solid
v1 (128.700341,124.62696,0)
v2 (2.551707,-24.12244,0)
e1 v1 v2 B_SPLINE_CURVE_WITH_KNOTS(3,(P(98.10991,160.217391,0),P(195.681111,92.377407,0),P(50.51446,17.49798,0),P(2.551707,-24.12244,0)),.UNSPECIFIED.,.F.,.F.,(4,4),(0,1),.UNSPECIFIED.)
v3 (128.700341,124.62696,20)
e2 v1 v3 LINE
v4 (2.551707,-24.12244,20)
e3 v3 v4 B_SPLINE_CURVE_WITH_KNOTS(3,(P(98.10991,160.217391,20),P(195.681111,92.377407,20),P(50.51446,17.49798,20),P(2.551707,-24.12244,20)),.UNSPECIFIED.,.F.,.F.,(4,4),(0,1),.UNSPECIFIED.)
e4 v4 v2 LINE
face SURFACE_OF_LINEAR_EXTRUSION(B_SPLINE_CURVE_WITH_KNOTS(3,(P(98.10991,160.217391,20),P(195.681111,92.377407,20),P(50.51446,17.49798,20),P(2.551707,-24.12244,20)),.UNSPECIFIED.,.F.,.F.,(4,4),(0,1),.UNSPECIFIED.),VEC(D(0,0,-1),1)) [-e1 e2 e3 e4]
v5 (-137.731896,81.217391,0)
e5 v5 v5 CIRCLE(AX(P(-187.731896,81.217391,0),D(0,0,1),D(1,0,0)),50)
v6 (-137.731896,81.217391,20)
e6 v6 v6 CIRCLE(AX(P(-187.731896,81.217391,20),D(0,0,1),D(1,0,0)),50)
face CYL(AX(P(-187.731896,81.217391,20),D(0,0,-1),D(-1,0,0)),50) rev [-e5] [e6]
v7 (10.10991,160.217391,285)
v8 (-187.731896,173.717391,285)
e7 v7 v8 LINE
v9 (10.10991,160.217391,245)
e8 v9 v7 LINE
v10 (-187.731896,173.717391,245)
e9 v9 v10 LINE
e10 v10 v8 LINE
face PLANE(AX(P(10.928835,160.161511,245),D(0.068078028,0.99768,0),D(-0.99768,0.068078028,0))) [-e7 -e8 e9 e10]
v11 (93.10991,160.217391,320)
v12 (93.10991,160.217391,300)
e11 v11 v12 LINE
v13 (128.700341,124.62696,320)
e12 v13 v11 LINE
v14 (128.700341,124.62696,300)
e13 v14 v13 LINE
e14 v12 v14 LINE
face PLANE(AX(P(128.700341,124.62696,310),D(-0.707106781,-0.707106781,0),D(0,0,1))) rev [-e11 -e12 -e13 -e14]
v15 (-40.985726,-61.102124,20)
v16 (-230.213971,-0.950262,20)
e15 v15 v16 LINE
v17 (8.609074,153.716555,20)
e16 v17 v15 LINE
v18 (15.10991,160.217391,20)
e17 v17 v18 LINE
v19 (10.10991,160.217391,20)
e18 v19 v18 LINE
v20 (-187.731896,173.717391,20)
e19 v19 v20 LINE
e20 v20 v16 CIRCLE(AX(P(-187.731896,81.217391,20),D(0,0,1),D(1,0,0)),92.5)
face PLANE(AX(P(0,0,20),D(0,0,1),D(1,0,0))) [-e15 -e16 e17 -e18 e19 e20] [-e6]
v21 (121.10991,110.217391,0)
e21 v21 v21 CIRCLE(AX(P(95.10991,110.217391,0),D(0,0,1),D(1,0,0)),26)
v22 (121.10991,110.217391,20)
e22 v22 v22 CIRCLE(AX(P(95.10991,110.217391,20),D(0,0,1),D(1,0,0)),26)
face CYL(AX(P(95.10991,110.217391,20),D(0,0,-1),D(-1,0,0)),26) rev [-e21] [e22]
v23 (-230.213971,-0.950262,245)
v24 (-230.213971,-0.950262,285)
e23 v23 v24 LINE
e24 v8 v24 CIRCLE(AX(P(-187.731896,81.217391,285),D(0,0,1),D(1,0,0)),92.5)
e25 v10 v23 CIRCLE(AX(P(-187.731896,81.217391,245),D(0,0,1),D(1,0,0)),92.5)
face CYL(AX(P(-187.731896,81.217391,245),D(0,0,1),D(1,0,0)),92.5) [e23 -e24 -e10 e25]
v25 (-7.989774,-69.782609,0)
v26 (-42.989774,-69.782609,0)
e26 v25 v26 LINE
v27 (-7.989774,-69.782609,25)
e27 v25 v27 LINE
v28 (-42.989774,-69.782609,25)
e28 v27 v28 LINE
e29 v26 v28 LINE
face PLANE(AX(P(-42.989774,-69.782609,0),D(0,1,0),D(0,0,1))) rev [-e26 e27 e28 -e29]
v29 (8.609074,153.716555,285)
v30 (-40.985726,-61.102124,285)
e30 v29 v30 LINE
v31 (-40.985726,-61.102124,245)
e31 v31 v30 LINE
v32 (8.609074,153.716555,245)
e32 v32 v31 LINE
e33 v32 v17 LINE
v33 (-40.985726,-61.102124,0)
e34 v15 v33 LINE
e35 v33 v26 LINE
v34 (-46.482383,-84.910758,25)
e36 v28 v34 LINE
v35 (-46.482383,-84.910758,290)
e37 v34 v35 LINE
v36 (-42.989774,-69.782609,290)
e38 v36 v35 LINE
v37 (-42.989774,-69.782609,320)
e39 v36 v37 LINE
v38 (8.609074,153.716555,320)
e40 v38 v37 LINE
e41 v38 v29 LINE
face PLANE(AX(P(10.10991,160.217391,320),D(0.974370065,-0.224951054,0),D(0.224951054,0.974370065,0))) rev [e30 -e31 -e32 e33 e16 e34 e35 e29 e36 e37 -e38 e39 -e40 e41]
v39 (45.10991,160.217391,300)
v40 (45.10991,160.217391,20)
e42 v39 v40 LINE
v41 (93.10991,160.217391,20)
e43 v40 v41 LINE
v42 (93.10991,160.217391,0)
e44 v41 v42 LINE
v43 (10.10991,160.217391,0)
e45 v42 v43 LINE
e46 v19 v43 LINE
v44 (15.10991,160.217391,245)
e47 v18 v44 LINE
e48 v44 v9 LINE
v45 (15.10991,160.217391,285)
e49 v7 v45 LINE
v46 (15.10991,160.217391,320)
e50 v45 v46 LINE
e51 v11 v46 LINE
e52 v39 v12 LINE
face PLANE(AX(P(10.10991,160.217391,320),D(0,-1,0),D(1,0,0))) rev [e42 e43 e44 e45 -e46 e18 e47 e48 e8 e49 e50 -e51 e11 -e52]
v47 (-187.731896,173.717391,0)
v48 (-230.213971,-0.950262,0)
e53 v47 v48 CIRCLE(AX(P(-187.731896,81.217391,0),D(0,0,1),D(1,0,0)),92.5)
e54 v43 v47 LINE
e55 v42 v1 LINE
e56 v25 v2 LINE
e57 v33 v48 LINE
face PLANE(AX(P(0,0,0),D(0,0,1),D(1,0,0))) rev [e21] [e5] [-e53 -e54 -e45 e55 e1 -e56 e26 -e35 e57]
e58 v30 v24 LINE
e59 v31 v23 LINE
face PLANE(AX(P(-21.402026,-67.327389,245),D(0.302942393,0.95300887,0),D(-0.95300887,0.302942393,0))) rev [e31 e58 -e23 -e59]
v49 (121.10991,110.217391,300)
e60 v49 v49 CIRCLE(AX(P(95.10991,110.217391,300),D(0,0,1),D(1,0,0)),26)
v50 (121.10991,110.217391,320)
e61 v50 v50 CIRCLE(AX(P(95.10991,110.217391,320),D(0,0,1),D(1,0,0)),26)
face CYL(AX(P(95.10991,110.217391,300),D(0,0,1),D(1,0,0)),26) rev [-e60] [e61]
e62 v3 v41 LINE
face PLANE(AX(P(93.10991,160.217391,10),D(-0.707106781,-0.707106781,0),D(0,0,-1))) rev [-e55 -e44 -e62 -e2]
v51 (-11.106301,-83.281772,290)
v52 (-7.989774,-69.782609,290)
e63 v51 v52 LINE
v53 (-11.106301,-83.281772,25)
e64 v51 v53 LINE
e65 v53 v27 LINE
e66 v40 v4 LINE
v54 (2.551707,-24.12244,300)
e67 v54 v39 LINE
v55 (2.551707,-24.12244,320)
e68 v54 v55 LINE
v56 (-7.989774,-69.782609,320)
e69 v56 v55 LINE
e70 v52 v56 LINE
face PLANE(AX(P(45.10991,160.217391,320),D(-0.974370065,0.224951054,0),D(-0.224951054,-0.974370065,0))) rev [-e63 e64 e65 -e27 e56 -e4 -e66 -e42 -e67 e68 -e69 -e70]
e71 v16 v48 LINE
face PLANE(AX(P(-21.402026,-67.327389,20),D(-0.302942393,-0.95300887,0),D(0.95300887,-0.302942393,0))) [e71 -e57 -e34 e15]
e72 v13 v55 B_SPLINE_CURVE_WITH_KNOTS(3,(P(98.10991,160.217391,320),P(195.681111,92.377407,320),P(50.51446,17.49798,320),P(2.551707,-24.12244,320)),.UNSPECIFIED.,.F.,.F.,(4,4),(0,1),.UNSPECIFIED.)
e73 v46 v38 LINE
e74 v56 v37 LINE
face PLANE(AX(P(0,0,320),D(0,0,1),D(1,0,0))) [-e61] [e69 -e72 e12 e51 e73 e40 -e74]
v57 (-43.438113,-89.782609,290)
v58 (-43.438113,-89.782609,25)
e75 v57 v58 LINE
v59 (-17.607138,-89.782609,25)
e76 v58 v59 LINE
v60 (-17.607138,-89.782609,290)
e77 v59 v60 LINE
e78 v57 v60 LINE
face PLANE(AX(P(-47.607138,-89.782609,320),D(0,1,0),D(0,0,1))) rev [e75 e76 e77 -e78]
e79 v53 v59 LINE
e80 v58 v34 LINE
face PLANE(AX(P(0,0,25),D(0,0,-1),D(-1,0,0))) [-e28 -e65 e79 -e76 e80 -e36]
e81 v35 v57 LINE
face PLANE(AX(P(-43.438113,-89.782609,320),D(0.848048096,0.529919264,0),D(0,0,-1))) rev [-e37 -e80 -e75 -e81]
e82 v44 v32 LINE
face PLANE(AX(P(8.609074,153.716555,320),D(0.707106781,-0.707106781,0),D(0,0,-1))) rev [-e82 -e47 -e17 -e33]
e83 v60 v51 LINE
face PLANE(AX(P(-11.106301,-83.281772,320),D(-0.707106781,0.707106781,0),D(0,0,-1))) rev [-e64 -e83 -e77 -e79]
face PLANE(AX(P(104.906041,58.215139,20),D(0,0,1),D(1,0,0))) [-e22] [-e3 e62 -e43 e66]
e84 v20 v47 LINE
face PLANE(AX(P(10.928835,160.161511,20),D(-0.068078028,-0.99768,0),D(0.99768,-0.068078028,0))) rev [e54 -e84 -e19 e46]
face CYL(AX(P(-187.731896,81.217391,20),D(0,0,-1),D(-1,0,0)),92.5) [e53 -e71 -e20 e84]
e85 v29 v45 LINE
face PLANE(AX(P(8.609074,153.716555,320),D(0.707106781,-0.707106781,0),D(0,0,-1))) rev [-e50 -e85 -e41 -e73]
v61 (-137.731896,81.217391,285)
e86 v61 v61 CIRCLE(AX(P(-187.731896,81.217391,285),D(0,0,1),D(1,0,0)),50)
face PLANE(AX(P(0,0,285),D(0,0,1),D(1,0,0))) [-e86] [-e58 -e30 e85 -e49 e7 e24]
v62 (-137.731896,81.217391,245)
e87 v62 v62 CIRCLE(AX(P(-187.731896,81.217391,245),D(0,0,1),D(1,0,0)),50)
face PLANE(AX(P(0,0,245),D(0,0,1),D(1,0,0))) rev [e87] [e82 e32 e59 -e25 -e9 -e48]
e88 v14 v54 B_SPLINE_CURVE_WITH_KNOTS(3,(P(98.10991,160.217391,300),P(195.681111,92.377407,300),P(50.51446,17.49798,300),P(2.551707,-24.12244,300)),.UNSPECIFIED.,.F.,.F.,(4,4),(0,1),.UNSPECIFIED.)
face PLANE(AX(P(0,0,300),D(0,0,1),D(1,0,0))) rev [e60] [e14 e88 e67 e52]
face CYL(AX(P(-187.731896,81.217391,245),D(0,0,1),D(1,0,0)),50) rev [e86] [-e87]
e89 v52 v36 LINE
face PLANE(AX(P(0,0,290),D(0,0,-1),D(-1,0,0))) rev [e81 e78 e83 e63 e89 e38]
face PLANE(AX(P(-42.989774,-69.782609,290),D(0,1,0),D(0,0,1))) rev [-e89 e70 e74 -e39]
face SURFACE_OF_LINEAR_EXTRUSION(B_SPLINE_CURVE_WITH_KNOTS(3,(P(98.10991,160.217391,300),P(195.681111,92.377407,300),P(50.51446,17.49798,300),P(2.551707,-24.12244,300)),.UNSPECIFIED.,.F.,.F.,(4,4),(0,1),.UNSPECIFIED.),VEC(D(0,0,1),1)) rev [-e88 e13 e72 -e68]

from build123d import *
from OCP.BRepFilletAPI import BRepFilletAPI_MakeChamfer

# Parameters (mm, degrees)
BOSS_EXTRU_1_DEPTH      = 320
ENL_V_MAT_EXTRU_1_DEPTH = 30
ENL_V_START             = -295
ENL_V_MAT_EXTRU_2_DEPTH = 25
ESQUISSE5_R             = 26
BOSS_EXTRU_2_DEPTH      = 20
BOSS_EXTRU_3_START      = -35
ESQUISSE5_3_R           = 50
BOSS_EXTRU_3_DEPTH      = 40
BOSS_EXTRU_4_START      = -300
ESQUISSE5_5_R           = 50
BOSS_EXTRU_4_DEPTH      = 20
BOSS_EXTRU_5_START      = -300
ESQUISSE5_6_R           = 26
BOSS_EXTRU_5_DEPTH      = 20
CHANFREIN1_SIZE         = 5
CHANFREIN1_SIZE_2       = 6.671835022
CHANFREIN2_SIZE         = 5
CHANFREIN2_SIZE2        = 6.671835022
CHANFREIN2_SIZE2_2      = 4.169025226
CHAMFER1_START          = 179.129452599
CHAMFER1_OUTLINE_W      = 53
CHAMFER1_OUTLINE_H      = 22
CHAMFER1_DEPTH          = 6.870547401
CHAMFER3_START          = 179.129452599
CHAMFER3_OUTLINE_W      = 53
CHAMFER3_OUTLINE_H      = 22
CHAMFER3_DEPTH          = 6.870547401


with BuildPart() as part:
    # Esquisse1 → Boss.-Extru.1 (new body)
    with BuildSketch(Plane.XY):
        Polygon((10.109909982, 160.217391304), (45.109909982, 160.217391304), (-12.607137799, -89.782608696), (-47.607137799, -89.782608696), align=None)
    extrude(amount=BOSS_EXTRU_1_DEPTH)

    # Esquisse2 → Enlèv. mat.-Extru.1 (cut)
    with BuildSketch(Plane.XY.offset(320)):
        Polygon((-47.607137799, -89.782608696), (-42.989773977, -69.782608696), (-7.989773977, -69.782608696), (-12.607137799, -89.782608696), align=None)
    extrude(amount=-ENL_V_MAT_EXTRU_1_DEPTH, mode=Mode.SUBTRACT)

    # Esquisse3 → Enlèv. mat.-Extru.2 (cut)
    with BuildSketch(Plane.XY.offset(320).offset(ENL_V_START)):
        Polygon((-47.607137799, -89.782608696), (-42.989773977, -69.782608696), (-7.989773977, -69.782608696), (-12.607137799, -89.782608696), align=None)
    extrude(amount=-ENL_V_MAT_EXTRU_2_DEPTH, mode=Mode.SUBTRACT)

    # Esquisse5 → Boss.-Extru.2 (add)
    with BuildSketch(Plane.XY.offset(320)):
        with BuildLine():
            Line((98.109909982, 160.217391304), (45.109909982, 160.217391304))
            Line((45.109909982, 160.217391304), (2.551706555, -24.122440094))
            add(Edge.make_bspline(
                [(98.109909982, 160.217391304), (195.681111268, 92.37740659), (50.514460477, 17.497979542), (2.551706555, -24.122440094)],
                knots=[0, 0, 0, 0, 1, 1, 1, 1], degree=3))
        make_face()
        with Locations((95.109909982, 110.217391304)):
            Circle(ESQUISSE5_R, mode=Mode.SUBTRACT)
    extrude(amount=-BOSS_EXTRU_2_DEPTH)

    # Esquisse5<3> → Boss.-Extru.3 (add)
    with BuildSketch(Plane.XY.offset(320).offset(BOSS_EXTRU_3_START)):
        with BuildLine():
            Line((-230.213971145, -0.950262244), (-40.985726083, -61.102123595))
            Line((-40.985726083, -61.102123595), (10.109909982, 160.217391304))
            Line((10.109909982, 160.217391304), (-187.731895981, 173.717391304))
            ThreePointArc((-187.731895981, 173.717391304), (-277.611698921, 103.077652588), (-230.213971145, -0.950262244))
        make_face()
        with Locations((-187.731895981, 81.217391304)):
            Circle(ESQUISSE5_3_R, mode=Mode.SUBTRACT)
    extrude(amount=-BOSS_EXTRU_3_DEPTH)

    # Esquisse5<5> → Boss.-Extru.4 (add)
    with BuildSketch(Plane.XY.offset(320).offset(BOSS_EXTRU_4_START)):
        with BuildLine():
            Line((-230.213971145, -0.950262244), (-40.985726083, -61.102123595))
            Line((-40.985726083, -61.102123595), (10.109909982, 160.217391304))
            Line((10.109909982, 160.217391304), (-187.731895981, 173.717391304))
            ThreePointArc((-187.731895981, 173.717391304), (-277.611698921, 103.077652588), (-230.213971145, -0.950262244))
        make_face()
        with Locations((-187.731895981, 81.217391304)):
            Circle(ESQUISSE5_5_R, mode=Mode.SUBTRACT)
    extrude(amount=-BOSS_EXTRU_4_DEPTH)

    # Esquisse5<6> → Boss.-Extru.5 (add)
    with BuildSketch(Plane.XY.offset(320).offset(BOSS_EXTRU_5_START)):
        with BuildLine():
            Line((98.109909982, 160.217391304), (45.109909982, 160.217391304))
            Line((45.109909982, 160.217391304), (2.551706555, -24.122440094))
            add(Edge.make_bspline(
                [(98.109909982, 160.217391304), (195.681111268, 92.37740659), (50.514460477, 17.497979542), (2.551706555, -24.122440094)],
                knots=[0, 0, 0, 0, 1, 1, 1, 1], degree=3))
        make_face()
        with Locations((95.109909982, 110.217391304)):
            Circle(ESQUISSE5_6_R, mode=Mode.SUBTRACT)
    extrude(amount=-BOSS_EXTRU_5_DEPTH)

    # Chanfrein1
    # the kernel refuses this chamfer: 6.671835022, 5 mm, written as the material it takes off along each edge
    with BuildSketch(Plane(origin=(10.109909982, 160.217391304, 20), x_dir=(1, 0, 0), z_dir=(0, 0, 1))) as chanfrein1_piece_1:
        Polygon((CHANFREIN1_SIZE, 0), (-CHANFREIN1_SIZE_2 * 0.224951054343, -CHANFREIN1_SIZE_2 * 0.974370064782), (0, 0), align=None)
    extrude(amount=225, mode=Mode.SUBTRACT)
    with BuildSketch(Plane(origin=(10.109909982, 160.217391304, 285), x_dir=(1, 0, 0), z_dir=(0, 0, 1))) as chanfrein1_piece_2:
        Polygon((CHANFREIN1_SIZE, 0), (-CHANFREIN1_SIZE_2 * 0.224951054343, -CHANFREIN1_SIZE_2 * 0.974370064782), (0, 0), align=None)
    extrude(amount=52.24901503, mode=Mode.SUBTRACT)

    # Chanfrein2: one chamfer whose edges measure the first distance from different faces: ONE call of the kernel's chamfer builder (chamfer() names one face for all edges)
    chanfrein2_edges_1 = [part.edges().sort_by_distance(p)[0] for p in [
        (-12.607137799, -89.782608696, 157.5),
    ]]
    chanfrein2_side_1 = [part.faces().sort_by_distance(p)[0] for p in [
        (-30.107137799, -89.782608696, 157.5),
    ]]
    chanfrein2_edges_2 = [part.edges().sort_by_distance(p)[0] for p in [
        (-47.607137799, -89.782608696, 157.5),
    ]]
    chanfrein2_side_2 = [part.faces().sort_by_distance(p)[0] for p in [
        (-19.722598228, 30.998601722, 155.760522115),
    ]]
    chanfrein2 = BRepFilletAPI_MakeChamfer(part.part.solid().wrapped)
    for e in chanfrein2_edges_1:
        chanfrein2.Add(CHANFREIN2_SIZE, CHANFREIN2_SIZE2, e.wrapped, chanfrein2_side_1[0].wrapped)  # the first distance lies on this face
    for e in chanfrein2_edges_2:
        chanfrein2.Add(CHANFREIN2_SIZE, CHANFREIN2_SIZE2_2, e.wrapped, chanfrein2_side_2[0].wrapped)  # the first distance lies on this face
    add(Compound.cast(chanfrein2.Shape()), mode=Mode.REPLACE)

    # Chamfer1: read off the stored shape, not the designer's step
    # Chamfer1 outline → Chamfer1 (cut)
    with BuildSketch(Plane(origin=(0, 0, 0), x_dir=(0.7071067811868629, -0.707106781186232, 0), z_dir=(0.707106781186232, 0.707106781186863, 0)).offset(CHAMFER1_START)):
        with Locations((-22.5, -310)):
            Rectangle(CHAMFER1_OUTLINE_W, CHAMFER1_OUTLINE_H)
    extrude(amount=CHAMFER1_DEPTH, mode=Mode.SUBTRACT)

    # Chamfer3: read off the stored shape, not the designer's step
    # Chamfer3 outline → Chamfer3 (cut)
    with BuildSketch(Plane(origin=(0, 0, 0), x_dir=(0.7071067811868629, -0.707106781186232, 0), z_dir=(0.707106781186232, 0.707106781186863, 0)).offset(CHAMFER3_START)):
        with Locations((-22.5, -10)):
            Rectangle(CHAMFER3_OUTLINE_W, CHAMFER3_OUTLINE_H)
    extrude(amount=CHAMFER3_DEPTH, mode=Mode.SUBTRACT)


solid = part.part
